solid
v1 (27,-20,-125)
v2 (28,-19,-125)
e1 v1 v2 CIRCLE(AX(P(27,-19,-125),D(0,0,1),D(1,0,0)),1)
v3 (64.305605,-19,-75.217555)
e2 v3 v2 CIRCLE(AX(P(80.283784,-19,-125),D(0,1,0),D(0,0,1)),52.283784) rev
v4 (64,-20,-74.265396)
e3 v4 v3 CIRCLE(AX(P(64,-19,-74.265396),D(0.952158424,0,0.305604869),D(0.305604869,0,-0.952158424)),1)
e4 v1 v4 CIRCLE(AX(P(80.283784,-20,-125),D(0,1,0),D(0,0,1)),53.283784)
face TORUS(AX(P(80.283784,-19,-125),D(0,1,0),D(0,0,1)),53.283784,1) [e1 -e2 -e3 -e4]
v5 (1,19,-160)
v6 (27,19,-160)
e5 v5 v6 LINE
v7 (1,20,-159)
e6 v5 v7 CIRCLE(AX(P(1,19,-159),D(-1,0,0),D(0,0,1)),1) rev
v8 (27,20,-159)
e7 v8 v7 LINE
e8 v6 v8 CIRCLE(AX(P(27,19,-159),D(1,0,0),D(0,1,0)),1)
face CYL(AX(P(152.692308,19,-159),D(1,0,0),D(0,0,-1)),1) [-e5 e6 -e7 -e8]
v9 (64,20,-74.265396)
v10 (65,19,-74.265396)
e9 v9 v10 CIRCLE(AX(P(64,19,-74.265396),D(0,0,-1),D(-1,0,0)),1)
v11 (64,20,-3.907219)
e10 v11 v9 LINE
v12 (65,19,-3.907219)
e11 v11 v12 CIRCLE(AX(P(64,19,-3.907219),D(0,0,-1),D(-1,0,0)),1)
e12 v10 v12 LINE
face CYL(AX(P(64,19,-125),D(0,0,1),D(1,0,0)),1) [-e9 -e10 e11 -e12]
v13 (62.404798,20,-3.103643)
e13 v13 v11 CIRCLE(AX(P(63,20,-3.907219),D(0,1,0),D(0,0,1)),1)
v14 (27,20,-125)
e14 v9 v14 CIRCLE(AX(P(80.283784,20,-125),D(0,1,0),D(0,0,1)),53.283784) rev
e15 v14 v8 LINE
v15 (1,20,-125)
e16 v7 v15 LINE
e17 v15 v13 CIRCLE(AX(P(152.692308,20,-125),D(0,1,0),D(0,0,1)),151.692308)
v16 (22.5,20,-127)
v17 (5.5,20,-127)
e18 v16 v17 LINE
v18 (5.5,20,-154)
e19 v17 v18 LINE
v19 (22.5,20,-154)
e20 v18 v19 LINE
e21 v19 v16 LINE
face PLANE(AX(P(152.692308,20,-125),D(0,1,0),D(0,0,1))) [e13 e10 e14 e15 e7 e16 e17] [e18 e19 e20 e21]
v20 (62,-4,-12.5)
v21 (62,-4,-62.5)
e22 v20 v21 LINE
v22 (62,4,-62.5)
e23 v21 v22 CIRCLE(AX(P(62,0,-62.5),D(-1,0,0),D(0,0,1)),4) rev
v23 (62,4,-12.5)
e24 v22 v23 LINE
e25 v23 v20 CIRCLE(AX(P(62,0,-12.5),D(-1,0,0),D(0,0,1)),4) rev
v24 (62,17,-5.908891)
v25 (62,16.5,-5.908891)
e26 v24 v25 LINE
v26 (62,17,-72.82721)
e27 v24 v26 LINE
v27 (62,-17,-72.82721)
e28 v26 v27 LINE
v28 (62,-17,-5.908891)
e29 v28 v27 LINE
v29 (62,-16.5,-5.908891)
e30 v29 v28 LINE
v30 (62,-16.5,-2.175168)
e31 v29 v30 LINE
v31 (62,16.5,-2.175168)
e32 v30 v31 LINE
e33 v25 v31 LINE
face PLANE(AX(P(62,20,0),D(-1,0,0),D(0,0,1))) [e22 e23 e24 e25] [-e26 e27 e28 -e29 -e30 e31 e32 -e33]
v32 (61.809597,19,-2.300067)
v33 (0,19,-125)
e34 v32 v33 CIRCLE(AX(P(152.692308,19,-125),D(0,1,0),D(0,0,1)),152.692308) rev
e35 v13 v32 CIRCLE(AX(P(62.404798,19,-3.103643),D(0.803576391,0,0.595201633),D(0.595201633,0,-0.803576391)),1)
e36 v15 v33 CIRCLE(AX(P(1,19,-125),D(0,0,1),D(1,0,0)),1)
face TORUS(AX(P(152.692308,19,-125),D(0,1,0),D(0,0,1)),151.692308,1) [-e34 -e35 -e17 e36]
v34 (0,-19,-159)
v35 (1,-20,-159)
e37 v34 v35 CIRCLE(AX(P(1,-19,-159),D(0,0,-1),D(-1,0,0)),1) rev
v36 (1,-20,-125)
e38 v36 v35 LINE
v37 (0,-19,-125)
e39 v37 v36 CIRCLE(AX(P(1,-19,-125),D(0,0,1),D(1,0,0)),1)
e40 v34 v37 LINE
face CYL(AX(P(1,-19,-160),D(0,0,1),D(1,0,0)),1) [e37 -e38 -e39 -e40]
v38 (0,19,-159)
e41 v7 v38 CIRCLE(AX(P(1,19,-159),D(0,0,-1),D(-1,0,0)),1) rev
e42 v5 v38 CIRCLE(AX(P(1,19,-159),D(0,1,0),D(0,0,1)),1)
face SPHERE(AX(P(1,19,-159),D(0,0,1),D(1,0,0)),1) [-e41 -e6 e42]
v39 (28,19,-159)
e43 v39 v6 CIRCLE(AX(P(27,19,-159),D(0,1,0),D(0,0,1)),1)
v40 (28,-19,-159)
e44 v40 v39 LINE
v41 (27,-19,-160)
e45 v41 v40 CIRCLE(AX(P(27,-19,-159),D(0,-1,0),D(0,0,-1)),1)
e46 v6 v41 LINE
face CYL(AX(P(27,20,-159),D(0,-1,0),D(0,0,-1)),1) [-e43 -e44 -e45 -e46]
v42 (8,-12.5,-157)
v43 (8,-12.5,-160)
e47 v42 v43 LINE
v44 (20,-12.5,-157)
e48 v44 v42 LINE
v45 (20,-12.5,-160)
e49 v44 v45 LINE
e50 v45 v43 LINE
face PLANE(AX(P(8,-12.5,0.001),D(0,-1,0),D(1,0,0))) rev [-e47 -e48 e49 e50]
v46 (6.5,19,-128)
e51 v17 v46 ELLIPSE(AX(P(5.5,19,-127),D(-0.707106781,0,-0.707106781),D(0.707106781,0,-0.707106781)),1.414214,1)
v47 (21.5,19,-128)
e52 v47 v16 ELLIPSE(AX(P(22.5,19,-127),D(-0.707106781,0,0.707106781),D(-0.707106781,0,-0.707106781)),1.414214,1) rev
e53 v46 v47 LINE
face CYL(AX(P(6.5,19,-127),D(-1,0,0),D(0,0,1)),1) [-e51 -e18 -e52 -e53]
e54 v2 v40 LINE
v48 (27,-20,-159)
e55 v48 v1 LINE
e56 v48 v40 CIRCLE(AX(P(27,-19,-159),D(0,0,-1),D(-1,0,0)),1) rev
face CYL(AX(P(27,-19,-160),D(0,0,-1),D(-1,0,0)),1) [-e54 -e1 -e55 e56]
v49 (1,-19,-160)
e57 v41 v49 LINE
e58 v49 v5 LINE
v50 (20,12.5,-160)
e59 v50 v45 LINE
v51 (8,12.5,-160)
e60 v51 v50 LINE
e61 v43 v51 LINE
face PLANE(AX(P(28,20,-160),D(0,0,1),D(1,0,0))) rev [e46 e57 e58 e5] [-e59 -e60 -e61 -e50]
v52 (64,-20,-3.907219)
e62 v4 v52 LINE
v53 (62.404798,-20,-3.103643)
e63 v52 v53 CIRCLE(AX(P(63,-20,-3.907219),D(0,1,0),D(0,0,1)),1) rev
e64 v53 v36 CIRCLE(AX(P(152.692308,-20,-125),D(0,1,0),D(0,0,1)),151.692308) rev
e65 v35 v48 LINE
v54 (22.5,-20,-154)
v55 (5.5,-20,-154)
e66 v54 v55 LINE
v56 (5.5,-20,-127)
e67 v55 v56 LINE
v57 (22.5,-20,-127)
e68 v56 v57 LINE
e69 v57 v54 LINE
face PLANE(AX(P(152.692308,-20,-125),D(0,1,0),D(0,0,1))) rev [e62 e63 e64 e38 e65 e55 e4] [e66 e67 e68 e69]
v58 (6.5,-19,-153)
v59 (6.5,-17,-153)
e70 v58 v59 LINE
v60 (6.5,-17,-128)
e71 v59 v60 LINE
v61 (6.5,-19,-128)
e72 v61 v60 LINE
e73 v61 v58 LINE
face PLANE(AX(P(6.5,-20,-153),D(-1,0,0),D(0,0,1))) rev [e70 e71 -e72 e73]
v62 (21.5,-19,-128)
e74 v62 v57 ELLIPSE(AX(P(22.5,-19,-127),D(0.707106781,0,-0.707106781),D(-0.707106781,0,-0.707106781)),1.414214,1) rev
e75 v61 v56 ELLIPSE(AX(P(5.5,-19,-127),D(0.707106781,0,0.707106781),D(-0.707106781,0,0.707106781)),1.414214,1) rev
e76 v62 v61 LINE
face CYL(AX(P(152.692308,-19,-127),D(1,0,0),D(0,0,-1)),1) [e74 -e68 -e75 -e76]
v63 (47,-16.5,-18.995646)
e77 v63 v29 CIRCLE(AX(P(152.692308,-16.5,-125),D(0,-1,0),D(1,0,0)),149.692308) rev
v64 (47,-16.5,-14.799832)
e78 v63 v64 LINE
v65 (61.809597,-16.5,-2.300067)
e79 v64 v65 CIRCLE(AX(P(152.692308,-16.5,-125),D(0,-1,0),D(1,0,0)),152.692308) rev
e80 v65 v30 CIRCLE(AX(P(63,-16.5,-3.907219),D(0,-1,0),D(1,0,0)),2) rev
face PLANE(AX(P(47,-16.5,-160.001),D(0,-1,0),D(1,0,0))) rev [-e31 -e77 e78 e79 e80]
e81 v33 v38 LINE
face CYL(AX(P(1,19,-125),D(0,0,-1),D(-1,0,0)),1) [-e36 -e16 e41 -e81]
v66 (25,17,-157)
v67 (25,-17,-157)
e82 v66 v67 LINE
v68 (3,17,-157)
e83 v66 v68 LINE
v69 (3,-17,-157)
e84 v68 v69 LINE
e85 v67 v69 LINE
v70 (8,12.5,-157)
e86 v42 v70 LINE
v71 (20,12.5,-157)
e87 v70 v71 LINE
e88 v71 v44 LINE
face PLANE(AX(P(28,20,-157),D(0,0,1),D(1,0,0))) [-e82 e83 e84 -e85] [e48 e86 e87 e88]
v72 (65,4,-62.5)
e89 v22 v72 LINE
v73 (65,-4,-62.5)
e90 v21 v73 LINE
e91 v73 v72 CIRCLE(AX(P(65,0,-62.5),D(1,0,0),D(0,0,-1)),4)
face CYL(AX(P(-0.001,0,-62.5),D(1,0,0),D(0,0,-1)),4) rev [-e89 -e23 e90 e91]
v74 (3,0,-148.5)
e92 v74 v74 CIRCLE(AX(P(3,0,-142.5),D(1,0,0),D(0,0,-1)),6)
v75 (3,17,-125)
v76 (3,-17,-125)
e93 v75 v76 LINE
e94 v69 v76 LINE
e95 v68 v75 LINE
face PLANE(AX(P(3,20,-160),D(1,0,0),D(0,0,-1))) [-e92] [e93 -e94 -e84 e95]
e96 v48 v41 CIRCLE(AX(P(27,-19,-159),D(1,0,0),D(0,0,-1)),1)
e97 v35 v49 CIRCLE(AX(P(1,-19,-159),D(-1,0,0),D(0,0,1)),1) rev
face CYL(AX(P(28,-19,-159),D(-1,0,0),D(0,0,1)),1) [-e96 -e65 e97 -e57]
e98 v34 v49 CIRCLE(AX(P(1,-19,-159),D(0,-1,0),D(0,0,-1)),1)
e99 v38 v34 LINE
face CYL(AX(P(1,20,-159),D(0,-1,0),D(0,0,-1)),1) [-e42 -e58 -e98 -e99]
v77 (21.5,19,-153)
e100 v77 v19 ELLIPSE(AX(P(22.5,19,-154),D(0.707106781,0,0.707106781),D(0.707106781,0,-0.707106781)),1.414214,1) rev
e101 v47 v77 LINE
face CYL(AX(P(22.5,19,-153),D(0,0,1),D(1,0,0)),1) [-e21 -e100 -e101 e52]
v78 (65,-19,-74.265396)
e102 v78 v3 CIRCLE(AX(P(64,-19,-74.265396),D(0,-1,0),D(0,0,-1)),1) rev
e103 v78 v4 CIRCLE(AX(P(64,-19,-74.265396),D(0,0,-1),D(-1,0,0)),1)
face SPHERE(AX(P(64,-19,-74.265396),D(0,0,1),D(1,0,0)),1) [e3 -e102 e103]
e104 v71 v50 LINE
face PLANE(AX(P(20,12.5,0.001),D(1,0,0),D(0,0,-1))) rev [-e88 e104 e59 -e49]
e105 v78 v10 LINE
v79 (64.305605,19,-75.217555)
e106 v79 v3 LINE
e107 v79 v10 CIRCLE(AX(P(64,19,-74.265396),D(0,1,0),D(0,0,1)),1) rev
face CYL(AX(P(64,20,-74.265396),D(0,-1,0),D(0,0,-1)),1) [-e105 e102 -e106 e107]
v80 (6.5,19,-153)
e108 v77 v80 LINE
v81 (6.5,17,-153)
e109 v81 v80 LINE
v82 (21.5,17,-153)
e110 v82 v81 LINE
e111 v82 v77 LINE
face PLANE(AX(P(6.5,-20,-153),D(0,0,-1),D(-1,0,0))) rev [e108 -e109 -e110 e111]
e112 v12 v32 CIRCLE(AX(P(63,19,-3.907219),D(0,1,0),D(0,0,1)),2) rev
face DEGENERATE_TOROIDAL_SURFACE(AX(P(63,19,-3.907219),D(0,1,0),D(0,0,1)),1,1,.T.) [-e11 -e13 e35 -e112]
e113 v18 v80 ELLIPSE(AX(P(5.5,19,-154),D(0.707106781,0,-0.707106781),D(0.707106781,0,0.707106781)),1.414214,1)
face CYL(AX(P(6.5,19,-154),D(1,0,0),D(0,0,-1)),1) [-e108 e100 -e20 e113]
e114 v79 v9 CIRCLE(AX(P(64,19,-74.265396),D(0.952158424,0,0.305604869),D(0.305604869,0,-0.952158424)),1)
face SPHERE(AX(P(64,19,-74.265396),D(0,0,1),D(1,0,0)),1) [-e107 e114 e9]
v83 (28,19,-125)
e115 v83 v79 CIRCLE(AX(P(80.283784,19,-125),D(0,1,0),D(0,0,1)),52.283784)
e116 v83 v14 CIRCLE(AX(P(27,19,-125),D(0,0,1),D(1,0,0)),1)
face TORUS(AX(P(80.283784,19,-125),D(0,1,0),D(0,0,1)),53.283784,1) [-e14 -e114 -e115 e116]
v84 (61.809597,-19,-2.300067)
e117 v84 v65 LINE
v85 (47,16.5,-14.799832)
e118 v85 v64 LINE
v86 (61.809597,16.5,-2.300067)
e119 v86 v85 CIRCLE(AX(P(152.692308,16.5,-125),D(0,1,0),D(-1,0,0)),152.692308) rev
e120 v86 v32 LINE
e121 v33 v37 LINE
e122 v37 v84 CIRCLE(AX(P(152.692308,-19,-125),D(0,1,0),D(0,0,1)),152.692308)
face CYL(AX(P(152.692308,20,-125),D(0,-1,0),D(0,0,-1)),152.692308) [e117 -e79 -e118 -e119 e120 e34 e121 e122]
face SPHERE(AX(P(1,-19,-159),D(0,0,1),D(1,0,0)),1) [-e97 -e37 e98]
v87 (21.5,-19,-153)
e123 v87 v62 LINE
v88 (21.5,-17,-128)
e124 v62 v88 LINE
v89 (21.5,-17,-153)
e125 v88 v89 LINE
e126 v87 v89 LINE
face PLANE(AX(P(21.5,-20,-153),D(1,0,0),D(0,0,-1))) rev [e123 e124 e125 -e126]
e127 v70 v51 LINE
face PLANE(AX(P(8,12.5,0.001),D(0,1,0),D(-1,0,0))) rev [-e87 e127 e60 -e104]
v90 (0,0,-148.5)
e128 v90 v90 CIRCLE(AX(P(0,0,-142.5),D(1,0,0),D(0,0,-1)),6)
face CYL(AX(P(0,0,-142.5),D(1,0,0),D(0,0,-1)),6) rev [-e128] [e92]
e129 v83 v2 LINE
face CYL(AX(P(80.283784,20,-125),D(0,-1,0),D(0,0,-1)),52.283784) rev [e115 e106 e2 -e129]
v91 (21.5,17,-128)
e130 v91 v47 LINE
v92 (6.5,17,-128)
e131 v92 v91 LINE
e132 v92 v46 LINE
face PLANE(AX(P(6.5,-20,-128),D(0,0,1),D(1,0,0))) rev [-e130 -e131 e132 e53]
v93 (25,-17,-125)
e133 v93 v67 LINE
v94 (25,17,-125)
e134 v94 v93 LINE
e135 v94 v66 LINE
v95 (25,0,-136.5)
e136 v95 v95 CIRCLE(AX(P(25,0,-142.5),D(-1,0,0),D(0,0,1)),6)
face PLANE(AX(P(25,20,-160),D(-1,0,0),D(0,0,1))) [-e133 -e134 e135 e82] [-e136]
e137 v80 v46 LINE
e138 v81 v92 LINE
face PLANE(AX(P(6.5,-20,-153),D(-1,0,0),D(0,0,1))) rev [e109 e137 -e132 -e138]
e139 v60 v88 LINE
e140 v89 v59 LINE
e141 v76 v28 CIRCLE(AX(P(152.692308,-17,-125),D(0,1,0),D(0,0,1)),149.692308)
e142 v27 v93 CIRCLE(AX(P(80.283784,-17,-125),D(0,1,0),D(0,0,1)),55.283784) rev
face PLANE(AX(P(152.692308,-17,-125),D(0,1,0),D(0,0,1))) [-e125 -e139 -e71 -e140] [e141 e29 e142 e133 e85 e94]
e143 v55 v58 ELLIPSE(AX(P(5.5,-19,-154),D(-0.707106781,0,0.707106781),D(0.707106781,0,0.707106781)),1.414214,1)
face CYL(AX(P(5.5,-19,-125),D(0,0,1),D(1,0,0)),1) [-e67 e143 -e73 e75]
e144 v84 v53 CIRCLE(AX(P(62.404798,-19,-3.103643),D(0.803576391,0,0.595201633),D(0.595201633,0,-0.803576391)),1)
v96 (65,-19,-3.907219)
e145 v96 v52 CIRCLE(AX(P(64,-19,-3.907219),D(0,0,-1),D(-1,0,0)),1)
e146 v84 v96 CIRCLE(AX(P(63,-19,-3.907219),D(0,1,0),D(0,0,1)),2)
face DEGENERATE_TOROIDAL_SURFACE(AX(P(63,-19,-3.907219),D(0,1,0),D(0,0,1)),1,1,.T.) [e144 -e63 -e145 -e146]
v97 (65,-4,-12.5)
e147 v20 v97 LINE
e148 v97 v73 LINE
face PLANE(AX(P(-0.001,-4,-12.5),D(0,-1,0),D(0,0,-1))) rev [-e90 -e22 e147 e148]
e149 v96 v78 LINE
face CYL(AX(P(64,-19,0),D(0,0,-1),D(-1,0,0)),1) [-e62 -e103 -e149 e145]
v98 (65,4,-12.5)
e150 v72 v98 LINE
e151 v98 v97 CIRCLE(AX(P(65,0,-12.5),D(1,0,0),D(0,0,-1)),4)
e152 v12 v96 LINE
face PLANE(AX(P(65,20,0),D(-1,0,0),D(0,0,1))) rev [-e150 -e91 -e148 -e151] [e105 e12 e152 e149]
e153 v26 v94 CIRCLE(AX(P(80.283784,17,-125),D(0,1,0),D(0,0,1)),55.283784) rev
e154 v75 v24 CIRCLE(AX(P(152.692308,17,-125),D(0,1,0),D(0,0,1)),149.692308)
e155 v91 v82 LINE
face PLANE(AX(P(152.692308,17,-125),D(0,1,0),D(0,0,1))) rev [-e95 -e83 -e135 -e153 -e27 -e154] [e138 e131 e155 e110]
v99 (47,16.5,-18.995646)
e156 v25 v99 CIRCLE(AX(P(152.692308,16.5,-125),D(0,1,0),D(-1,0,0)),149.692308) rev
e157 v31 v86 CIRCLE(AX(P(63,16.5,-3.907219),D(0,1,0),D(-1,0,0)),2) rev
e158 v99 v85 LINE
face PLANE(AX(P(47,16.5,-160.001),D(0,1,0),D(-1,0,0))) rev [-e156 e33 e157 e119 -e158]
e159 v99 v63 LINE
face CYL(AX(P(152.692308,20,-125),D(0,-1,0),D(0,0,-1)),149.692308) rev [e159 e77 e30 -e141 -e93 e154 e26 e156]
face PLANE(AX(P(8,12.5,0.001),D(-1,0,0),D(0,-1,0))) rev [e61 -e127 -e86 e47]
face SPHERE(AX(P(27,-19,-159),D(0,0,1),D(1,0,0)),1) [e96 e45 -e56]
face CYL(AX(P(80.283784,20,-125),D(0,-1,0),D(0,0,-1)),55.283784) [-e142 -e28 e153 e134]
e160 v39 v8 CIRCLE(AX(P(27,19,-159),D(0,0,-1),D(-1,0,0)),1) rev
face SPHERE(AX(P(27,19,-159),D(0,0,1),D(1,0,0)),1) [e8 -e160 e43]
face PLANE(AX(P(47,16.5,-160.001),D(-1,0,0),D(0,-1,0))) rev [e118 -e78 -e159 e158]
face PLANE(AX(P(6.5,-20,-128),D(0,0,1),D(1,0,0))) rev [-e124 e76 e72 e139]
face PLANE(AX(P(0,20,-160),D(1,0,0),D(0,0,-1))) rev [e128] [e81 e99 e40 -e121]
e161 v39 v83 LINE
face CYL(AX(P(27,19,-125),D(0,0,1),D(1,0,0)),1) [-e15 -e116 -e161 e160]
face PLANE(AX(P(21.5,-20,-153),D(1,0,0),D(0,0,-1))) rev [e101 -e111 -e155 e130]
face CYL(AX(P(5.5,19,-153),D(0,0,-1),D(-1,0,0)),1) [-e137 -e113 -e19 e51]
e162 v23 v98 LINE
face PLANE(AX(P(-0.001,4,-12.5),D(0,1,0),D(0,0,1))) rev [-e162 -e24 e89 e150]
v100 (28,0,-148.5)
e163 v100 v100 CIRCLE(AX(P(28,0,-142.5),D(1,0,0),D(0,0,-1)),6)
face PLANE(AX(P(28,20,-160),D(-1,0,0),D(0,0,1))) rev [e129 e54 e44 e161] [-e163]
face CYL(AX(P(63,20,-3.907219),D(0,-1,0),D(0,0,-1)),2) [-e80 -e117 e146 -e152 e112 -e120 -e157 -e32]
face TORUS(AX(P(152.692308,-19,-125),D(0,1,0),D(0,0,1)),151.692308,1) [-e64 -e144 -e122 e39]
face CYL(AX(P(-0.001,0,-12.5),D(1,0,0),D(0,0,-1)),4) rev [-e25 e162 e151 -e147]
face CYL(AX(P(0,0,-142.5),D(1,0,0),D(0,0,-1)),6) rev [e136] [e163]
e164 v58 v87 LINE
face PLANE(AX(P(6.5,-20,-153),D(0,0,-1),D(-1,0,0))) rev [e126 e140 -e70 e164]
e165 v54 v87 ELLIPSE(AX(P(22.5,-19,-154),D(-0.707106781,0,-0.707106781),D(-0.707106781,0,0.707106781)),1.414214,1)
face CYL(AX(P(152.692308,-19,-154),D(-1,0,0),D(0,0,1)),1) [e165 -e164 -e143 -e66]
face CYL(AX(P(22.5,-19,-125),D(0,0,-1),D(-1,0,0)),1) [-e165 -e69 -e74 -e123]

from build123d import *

# Parameters (mm, degrees)
BOSS_EXTRUDE1_DEPTH     = 20
SHELL1_T                = 3
CUT_EXTRUDE1_REACH      = 175.853
SKETCH4_W               = 15
SKETCH4_H               = 25
CUT_EXTRUDE2_DEPTH      = 178.270979012
CUT_EXTRUDE3_REACH      = 175.853
SKETCH5_W               = 12
SKETCH5_H               = 25
SKETCH6_R               = 6
CUT_EXTRUDE4_DEPTH      = 166.435788148
CUT_EXTRUDE5_REACH      = 175.853
CUT_EXTRUDE5_END_RADIUS = 149.692307692
SKETCH7_W               = 15
SKETCH7_H               = 33
FILLET1_R               = 2
FILLET2_R               = 1


with BuildPart() as part:
    # Sketch2 → Boss-Extrude1 (new, symmetric)
    with BuildSketch(Plane(origin=(0, 0, 0), x_dir=(1, 0, 0), z_dir=(0, 1, 0))):
        with BuildLine():
            Line((65, 0), (65, 75))
            ThreePointArc((65, 75), (38.25588773, 93.89935692), (28, 125))
            Line((28, 125), (28, 160))
            Line((28, 160), (0, 160))
            Line((0, 160), (0, 125))
            ThreePointArc((0, 125), (17.221126888, 54.554985982), (65, 0))
        make_face()
    extrude(amount=BOSS_EXTRUDE1_DEPTH, both=True)

    # Shell1 (no face opened: a closed hollow body)
    add(offset(amount=-SHELL1_T, mode=Mode.PRIVATE), mode=Mode.SUBTRACT)

    # Sketch3 → Cut-Extrude1 (cut, up to next)
    with BuildSketch(Plane(origin=(65, 0, 0), x_dir=(0, 0, -1), z_dir=(1, 0, 0)), mode=Mode.PRIVATE) as cut_extrude1_sk1:
        with BuildLine():
            Line((12.5, 4), (62.5, 4))
            ThreePointArc((62.5, 4), (66.5, 0), (62.5, -4))
            Line((62.5, -4), (12.5, -4))
            ThreePointArc((12.5, -4), (8.5, 0), (12.5, 4))
        make_face()
    cut_extrude1_tool1 = extrude(cut_extrude1_sk1.sketch, amount=-CUT_EXTRUDE1_REACH, mode=Mode.PRIVATE) & part.part
    add(cut_extrude1_tool1.solids().sort_by_distance((65, 0, -37.5))[0], mode=Mode.SUBTRACT)

    # Sketch4 → Cut-Extrude2 (cut, through all)
    with BuildSketch(Plane(origin=(0, 20, 0), x_dir=(1, 0, 0), z_dir=(0, 1, 0))):
        with Locations((14, 140.5)):
            Rectangle(SKETCH4_W, SKETCH4_H)
    extrude(amount=-CUT_EXTRUDE2_DEPTH, mode=Mode.SUBTRACT)

    # Sketch5 → Cut-Extrude3 (cut, up to next)
    with BuildSketch(Plane(origin=(0, 0, -160), x_dir=(-1, 0, 0), z_dir=(0, 0, -1)), mode=Mode.PRIVATE) as cut_extrude3_sk1:
        with Locations((-14, 0)):
            Rectangle(SKETCH5_W, SKETCH5_H)
    cut_extrude3_tool1 = extrude(cut_extrude3_sk1.sketch, amount=-CUT_EXTRUDE3_REACH, mode=Mode.PRIVATE) & part.part
    add(cut_extrude3_tool1.solids().sort_by_distance((14, 0, -160))[0], mode=Mode.SUBTRACT)

    # Sketch6 → Cut-Extrude4 (cut, through all)
    with BuildSketch(Plane(origin=(28, 0, 0), x_dir=(0, 0, -1), z_dir=(1, 0, 0))):
        with Locations((142.5, 0)):
            Circle(SKETCH6_R)
    extrude(amount=-CUT_EXTRUDE4_DEPTH, mode=Mode.SUBTRACT)

    # Cut-Extrude5: up to this cylinder (the profile starts outside it)
    cut_extrude5_end = Plane(origin=(152.692307692, 0, -125), z_dir=(0, -1, 0)) * Cylinder(CUT_EXTRUDE5_END_RADIUS, 652.090615385, mode=Mode.PRIVATE)
    # Sketch7 → Cut-Extrude5 (cut, up to the surface)
    with BuildSketch(Plane.XY, mode=Mode.PRIVATE) as cut_extrude5_sk1:
        with Locations((54.5, 0)):
            Rectangle(SKETCH7_W, SKETCH7_H)
    cut_extrude5_tool1 = extrude(cut_extrude5_sk1.sketch, amount=-CUT_EXTRUDE5_REACH, mode=Mode.PRIVATE) - cut_extrude5_end
    add(cut_extrude5_tool1.solids().sort_by_distance((54.5, 0, 0))[0], mode=Mode.SUBTRACT)

    # Fillet1
    # the kernel refuses this fillet: 2 mm, written as the material it takes off along each edge
    with BuildSketch(Plane(origin=(65, -29.832655727, 0), x_dir=(-0.8111753720748651, 0, -0.584802971725695), z_dir=(0, 1, 0))) as fillet1_piece_1:
        with BuildLine():
            CenterArc((3.9073042, -1.999834123), FILLET1_R, 89.26206466, 126.527007428)
            Line((2.284953456, -3.169440067), (0, 0))
            ThreePointArc((0, 0), (1.966531145, 0.012664047), (3.933062291, 0))
        make_face()
    extrude(amount=59.665311453, mode=Mode.SUBTRACT)

    # Fillet2
    fillet2_edges = [part.edges().sort_by_distance(p)[0] for p in [
        (38.25588773, 20, -93.89935692),
        (0, 0, -160),
        (28, 0, -160),
        (65, 0, -75),
        (65, -20, -39.453609648),
        (65, 20, -39.453609648),
        (63.899775935, -20, -2.121049297),
        (63.899775935, 20, -2.121049297),
        (28, 20, -142.5),
        (14, 20, -160),
        (0, 20, -142.5),
        (16.325098118, 20, -56.305568047),
        (21.5, -20, -140.5),
        (14, -20, -128),
        (6.5, -20, -140.5),
        (14, -20, -153),
        (21.5, 20, -140.5),
        (14, 20, -153),
        (6.5, 20, -140.5),
        (14, 20, -128),
        (0, -20, -142.5),
        (14, -20, -160),
        (28, -20, -142.5),
        (38.25588773, -20, -93.89935692),
        (16.325098118, -20, -56.305568047),
    ]]
    fillet(fillet2_edges, radius=FILLET2_R)


solid = part.part
